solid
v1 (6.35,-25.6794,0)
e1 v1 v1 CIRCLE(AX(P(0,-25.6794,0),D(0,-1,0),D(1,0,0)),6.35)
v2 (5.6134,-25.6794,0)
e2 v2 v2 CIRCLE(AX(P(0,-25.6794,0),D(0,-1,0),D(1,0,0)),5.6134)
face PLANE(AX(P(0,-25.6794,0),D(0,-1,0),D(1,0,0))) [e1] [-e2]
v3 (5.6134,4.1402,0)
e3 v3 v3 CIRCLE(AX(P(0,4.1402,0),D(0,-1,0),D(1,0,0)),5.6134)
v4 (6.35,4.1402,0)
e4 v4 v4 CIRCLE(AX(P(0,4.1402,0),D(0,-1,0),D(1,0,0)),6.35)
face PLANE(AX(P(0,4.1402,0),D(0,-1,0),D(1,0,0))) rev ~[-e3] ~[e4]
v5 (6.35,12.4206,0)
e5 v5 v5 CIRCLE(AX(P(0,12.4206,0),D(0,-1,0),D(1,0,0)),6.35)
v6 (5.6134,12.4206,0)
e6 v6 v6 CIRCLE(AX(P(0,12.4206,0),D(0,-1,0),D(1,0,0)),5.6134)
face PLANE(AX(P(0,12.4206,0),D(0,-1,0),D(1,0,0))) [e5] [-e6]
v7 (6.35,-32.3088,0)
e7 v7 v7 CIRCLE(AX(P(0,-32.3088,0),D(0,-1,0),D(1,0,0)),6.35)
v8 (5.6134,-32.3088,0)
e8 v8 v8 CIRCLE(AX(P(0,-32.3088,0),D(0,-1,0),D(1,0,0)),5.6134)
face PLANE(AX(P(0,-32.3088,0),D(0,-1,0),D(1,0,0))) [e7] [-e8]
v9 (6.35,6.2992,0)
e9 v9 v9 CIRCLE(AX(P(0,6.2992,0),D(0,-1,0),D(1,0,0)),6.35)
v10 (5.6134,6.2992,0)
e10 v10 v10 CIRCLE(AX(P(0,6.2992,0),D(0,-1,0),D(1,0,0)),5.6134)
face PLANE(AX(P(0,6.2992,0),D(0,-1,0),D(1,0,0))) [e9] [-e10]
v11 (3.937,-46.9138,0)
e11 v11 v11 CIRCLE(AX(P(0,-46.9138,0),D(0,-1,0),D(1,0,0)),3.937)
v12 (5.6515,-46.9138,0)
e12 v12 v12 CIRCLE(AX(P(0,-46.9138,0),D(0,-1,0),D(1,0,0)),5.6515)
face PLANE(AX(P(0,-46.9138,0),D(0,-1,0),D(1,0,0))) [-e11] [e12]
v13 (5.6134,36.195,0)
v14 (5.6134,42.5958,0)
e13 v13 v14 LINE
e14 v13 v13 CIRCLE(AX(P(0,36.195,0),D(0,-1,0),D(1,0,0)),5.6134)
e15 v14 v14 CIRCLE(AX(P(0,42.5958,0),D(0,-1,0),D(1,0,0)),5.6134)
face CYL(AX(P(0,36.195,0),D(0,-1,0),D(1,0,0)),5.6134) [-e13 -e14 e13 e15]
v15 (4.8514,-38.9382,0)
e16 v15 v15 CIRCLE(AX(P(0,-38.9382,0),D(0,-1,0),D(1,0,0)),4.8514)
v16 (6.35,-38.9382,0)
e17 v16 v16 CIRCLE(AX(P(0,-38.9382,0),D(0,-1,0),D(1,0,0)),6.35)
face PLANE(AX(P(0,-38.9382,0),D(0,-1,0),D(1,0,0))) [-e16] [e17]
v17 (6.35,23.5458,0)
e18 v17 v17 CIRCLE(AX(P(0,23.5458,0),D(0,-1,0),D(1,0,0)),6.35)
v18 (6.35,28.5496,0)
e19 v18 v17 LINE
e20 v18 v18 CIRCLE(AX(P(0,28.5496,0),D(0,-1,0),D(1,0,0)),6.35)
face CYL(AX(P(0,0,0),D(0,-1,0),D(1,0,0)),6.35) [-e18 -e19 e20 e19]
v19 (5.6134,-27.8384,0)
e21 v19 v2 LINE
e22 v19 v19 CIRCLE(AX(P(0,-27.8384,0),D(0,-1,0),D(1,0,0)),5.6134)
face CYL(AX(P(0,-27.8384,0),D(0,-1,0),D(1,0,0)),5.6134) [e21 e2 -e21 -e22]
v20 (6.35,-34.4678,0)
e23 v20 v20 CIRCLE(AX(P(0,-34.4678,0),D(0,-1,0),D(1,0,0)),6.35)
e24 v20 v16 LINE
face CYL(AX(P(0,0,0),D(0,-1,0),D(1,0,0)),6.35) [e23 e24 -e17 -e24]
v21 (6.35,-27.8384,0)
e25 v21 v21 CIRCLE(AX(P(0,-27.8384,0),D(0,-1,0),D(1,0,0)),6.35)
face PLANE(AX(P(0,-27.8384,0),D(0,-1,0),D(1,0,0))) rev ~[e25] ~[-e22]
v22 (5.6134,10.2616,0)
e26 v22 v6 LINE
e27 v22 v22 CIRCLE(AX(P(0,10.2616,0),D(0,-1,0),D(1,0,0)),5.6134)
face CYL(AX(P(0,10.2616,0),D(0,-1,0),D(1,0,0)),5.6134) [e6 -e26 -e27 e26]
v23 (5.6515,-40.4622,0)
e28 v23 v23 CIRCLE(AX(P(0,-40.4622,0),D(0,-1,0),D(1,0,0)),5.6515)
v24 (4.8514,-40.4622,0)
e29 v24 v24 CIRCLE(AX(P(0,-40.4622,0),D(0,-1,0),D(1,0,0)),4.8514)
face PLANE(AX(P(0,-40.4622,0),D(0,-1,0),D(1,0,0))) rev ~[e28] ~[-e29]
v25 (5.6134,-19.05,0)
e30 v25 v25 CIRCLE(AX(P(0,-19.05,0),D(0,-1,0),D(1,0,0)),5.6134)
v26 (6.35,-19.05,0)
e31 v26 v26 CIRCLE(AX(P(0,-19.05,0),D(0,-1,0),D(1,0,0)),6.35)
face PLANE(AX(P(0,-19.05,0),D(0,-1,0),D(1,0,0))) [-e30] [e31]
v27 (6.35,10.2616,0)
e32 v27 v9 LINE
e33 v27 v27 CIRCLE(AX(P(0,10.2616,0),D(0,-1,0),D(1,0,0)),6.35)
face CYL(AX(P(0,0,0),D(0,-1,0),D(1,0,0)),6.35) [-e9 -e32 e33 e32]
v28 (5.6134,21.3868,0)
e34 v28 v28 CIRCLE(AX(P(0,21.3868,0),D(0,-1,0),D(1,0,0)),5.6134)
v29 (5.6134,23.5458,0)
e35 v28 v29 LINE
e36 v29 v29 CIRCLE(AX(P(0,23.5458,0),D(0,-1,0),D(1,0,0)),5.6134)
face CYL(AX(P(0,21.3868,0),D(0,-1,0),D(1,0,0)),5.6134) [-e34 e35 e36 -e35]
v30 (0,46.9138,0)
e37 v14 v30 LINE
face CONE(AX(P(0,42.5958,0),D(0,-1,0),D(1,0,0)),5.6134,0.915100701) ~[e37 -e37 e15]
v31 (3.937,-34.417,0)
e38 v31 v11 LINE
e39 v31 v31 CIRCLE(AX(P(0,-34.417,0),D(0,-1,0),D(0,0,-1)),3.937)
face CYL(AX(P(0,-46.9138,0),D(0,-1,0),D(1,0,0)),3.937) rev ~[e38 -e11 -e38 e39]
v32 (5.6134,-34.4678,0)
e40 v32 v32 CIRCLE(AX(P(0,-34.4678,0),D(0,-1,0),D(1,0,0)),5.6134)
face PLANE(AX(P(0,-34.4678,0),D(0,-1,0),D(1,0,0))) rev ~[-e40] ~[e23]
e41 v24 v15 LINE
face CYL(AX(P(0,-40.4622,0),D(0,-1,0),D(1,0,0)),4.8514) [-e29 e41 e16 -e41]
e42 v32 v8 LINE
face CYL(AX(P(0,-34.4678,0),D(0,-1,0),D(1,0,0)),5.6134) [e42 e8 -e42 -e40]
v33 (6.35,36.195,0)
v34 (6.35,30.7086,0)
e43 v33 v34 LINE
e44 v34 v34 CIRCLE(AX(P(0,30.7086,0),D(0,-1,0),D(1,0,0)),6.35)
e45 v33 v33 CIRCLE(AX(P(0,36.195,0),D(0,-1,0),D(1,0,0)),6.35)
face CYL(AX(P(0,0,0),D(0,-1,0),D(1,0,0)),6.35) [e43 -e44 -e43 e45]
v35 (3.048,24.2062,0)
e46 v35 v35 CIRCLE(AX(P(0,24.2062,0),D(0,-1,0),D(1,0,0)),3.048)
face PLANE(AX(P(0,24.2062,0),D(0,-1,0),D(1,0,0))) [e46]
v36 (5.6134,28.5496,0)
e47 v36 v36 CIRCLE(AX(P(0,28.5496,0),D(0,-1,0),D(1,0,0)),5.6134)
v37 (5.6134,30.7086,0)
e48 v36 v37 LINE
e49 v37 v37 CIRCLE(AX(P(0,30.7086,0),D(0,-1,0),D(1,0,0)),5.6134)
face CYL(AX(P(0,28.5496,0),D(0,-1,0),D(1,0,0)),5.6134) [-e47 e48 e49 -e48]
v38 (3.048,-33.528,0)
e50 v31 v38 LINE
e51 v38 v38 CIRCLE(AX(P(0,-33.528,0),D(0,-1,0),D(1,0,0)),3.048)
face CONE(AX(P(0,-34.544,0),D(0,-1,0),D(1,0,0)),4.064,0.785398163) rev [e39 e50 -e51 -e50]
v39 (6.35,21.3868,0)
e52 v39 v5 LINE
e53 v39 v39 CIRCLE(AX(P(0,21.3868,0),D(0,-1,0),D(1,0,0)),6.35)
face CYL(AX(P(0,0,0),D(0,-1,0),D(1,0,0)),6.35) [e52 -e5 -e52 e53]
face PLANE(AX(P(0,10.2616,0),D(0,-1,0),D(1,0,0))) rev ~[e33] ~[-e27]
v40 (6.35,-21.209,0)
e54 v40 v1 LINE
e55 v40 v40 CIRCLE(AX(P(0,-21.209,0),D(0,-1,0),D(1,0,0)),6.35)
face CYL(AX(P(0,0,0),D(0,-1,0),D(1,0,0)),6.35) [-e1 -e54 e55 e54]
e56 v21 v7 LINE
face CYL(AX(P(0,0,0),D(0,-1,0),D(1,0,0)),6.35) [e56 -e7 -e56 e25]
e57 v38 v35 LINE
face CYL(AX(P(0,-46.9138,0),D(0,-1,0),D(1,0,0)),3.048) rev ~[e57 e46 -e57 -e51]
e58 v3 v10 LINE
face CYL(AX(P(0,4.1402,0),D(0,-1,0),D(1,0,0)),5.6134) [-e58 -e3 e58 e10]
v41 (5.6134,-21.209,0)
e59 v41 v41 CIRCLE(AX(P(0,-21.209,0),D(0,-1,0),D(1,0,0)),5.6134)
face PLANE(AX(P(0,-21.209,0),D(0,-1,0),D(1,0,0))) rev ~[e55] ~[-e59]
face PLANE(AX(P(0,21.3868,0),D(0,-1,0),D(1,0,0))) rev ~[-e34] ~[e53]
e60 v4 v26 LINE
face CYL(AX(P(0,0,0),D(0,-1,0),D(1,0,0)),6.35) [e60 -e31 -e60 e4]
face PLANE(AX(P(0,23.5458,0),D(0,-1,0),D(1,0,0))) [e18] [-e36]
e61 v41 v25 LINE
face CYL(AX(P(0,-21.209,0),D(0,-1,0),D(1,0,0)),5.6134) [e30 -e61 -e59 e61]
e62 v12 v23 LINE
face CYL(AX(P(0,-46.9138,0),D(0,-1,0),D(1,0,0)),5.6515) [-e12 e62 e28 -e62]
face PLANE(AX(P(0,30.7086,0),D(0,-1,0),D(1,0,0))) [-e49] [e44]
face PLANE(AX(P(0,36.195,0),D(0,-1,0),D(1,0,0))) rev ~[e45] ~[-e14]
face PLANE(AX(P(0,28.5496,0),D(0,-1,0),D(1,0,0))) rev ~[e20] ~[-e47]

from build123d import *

# Parameters (mm, degrees)
F0_R         = 6.35
F1_DEPTH     = 46.9138
F2_R         = 3.048
F3_DEPTH     = 71.12
F4_R         = 3.937
F5_DEPTH     = 12.3698
F6_R         = 6.35
F6_R_2       = 5.6515
F7_DEPTH     = 6.4516
F8_R         = 6.35
F8_R_2       = 4.8514
F9_DEPTH     = 1.524
F10_S5_R     = 3.937
F10_T6_DEPTH = 7
F12_R        = 6.35
F12_R_2      = 5.6134
F13_DEPTH    = 2.159
F15_R        = 6.35
F15_R_2      = 5.6134
F16_DEPTH    = 2.159
F18_R        = 6.35
F18_R_2      = 5.6134
F19_DEPTH    = 2.159
F21_R        = 6.35
F21_R_2      = 5.6134
F22_DEPTH    = 2.159
F24_R        = 6.35
F24_R_2      = 5.6134
F25_DEPTH    = 2.159
F27_R        = 6.35
F27_R_2      = 5.6134
F28_DEPTH    = 2.159
F30_R        = 6.35
F30_R_2      = 5.6134
F31_DEPTH    = 2.159
F33_R        = 6.35
F33_R_2      = 5.6134
F34_DEPTH    = 10.7198
F35_SIZE2    = 5.6134
F35_SIZE     = 4.318


# Not quite as in the source:
# - a fillet or chamfer that OpenCascade refuses, or shapes differently, is made with other operations: its cross-section is extruded or revolved along the edge and cut away or added


with BuildPart() as f1:
    # F0 (on Front) → F1 (new body, symmetric)
    with BuildSketch(Plane.XZ):
        Circle(F0_R)
    extrude(amount=F1_DEPTH, both=True)

    # F2 (on face) → F3 (cut)
    with BuildSketch(Plane.XZ.offset(46.9138)):
        Circle(F2_R)
    extrude(amount=-F3_DEPTH, mode=Mode.SUBTRACT)

    # F4 (on face) → F5 (cut)
    with BuildSketch(Plane.XZ.offset(46.9138)):
        Circle(F4_R)
    extrude(amount=-F5_DEPTH, mode=Mode.SUBTRACT)

    # F6 (on face) → F7 (cut)
    with BuildSketch(Plane.XZ.offset(46.9138)):
        Circle(F6_R)
        Circle(F6_R_2, mode=Mode.SUBTRACT)
    extrude(amount=-F7_DEPTH, mode=Mode.SUBTRACT)

    # F8 (on face) → F9 (cut)
    with BuildSketch(Plane.XZ.offset(40.4622)):
        Circle(F8_R)
        Circle(F8_R_2, mode=Mode.SUBTRACT)
    extrude(amount=-F9_DEPTH, mode=Mode.SUBTRACT)

    # F10: chamfer of 1.016 on 1 edges, made by hand


with BuildPart() as f10_tool2:
    # F10_s3 → F10_t4 (revolve)
    with BuildSketch(Plane.XY):
        Polygon((4.064, -34.544), (3.048, -33.528), (3.048, -34.544), align=None)
    revolve(axis=Axis((0, -34.544, 0), (0, -1, 0)))

    # F10_s5 → F10_t6 (intersect, symmetric)
    with BuildSketch(Plane.XZ.offset(34)):
        Circle(F10_S5_R)
    extrude(amount=F10_T6_DEPTH, both=True, mode=Mode.INTERSECT)


with BuildPart() as f1_1:
    add(f1.part)

    # F10_t1: cut F10_tool2
    add(f10_tool2.part, mode=Mode.SUBTRACT)

    # F12 (on offset) → F13 (cut)
    with BuildSketch(Plane.XZ.offset(34.4678)):
        Circle(F12_R)
        Circle(F12_R_2, mode=Mode.SUBTRACT)
    extrude(amount=-F13_DEPTH, mode=Mode.SUBTRACT)

    # F15 (on offset) → F16 (cut)
    with BuildSketch(Plane.XZ.offset(27.8384)):
        Circle(F15_R)
        Circle(F15_R_2, mode=Mode.SUBTRACT)
    extrude(amount=-F16_DEPTH, mode=Mode.SUBTRACT)

    # F18 (on offset) → F19 (cut)
    with BuildSketch(Plane.XZ.offset(21.209)):
        Circle(F18_R)
        Circle(F18_R_2, mode=Mode.SUBTRACT)
    extrude(amount=-F19_DEPTH, mode=Mode.SUBTRACT)

    # F21 (on offset) → F22 (cut)
    with BuildSketch(Plane.XZ.offset(-4.1402)):
        Circle(F21_R)
        Circle(F21_R_2, mode=Mode.SUBTRACT)
    extrude(amount=-F22_DEPTH, mode=Mode.SUBTRACT)

    # F24 (on offset) → F25 (cut)
    with BuildSketch(Plane.XZ.offset(-10.2616)):
        Circle(F24_R)
        Circle(F24_R_2, mode=Mode.SUBTRACT)
    extrude(amount=-F25_DEPTH, mode=Mode.SUBTRACT)

    # F27 (on offset) → F28 (cut)
    with BuildSketch(Plane.XZ.offset(-21.3868)):
        Circle(F27_R)
        Circle(F27_R_2, mode=Mode.SUBTRACT)
    extrude(amount=-F28_DEPTH, mode=Mode.SUBTRACT)

    # F30 (on offset) → F31 (cut)
    with BuildSketch(Plane.XZ.offset(-28.5496)):
        Circle(F30_R)
        Circle(F30_R_2, mode=Mode.SUBTRACT)
    extrude(amount=-F31_DEPTH, mode=Mode.SUBTRACT)

    # F33 (on offset) → F34 (cut, through all)
    with BuildSketch(Plane.XZ.offset(-36.195)):
        Circle(F33_R)
        Circle(F33_R_2, mode=Mode.SUBTRACT)
    extrude(amount=-F34_DEPTH, mode=Mode.SUBTRACT)

    # F35
    f35_edges = [f1_1.edges().sort_by_distance(p)[0] for p in [
        (-5.6134, 46.9138, 0),
    ]]
    chamfer(f35_edges, length=F35_SIZE, length2=F35_SIZE2)


solid = f1_1.part
